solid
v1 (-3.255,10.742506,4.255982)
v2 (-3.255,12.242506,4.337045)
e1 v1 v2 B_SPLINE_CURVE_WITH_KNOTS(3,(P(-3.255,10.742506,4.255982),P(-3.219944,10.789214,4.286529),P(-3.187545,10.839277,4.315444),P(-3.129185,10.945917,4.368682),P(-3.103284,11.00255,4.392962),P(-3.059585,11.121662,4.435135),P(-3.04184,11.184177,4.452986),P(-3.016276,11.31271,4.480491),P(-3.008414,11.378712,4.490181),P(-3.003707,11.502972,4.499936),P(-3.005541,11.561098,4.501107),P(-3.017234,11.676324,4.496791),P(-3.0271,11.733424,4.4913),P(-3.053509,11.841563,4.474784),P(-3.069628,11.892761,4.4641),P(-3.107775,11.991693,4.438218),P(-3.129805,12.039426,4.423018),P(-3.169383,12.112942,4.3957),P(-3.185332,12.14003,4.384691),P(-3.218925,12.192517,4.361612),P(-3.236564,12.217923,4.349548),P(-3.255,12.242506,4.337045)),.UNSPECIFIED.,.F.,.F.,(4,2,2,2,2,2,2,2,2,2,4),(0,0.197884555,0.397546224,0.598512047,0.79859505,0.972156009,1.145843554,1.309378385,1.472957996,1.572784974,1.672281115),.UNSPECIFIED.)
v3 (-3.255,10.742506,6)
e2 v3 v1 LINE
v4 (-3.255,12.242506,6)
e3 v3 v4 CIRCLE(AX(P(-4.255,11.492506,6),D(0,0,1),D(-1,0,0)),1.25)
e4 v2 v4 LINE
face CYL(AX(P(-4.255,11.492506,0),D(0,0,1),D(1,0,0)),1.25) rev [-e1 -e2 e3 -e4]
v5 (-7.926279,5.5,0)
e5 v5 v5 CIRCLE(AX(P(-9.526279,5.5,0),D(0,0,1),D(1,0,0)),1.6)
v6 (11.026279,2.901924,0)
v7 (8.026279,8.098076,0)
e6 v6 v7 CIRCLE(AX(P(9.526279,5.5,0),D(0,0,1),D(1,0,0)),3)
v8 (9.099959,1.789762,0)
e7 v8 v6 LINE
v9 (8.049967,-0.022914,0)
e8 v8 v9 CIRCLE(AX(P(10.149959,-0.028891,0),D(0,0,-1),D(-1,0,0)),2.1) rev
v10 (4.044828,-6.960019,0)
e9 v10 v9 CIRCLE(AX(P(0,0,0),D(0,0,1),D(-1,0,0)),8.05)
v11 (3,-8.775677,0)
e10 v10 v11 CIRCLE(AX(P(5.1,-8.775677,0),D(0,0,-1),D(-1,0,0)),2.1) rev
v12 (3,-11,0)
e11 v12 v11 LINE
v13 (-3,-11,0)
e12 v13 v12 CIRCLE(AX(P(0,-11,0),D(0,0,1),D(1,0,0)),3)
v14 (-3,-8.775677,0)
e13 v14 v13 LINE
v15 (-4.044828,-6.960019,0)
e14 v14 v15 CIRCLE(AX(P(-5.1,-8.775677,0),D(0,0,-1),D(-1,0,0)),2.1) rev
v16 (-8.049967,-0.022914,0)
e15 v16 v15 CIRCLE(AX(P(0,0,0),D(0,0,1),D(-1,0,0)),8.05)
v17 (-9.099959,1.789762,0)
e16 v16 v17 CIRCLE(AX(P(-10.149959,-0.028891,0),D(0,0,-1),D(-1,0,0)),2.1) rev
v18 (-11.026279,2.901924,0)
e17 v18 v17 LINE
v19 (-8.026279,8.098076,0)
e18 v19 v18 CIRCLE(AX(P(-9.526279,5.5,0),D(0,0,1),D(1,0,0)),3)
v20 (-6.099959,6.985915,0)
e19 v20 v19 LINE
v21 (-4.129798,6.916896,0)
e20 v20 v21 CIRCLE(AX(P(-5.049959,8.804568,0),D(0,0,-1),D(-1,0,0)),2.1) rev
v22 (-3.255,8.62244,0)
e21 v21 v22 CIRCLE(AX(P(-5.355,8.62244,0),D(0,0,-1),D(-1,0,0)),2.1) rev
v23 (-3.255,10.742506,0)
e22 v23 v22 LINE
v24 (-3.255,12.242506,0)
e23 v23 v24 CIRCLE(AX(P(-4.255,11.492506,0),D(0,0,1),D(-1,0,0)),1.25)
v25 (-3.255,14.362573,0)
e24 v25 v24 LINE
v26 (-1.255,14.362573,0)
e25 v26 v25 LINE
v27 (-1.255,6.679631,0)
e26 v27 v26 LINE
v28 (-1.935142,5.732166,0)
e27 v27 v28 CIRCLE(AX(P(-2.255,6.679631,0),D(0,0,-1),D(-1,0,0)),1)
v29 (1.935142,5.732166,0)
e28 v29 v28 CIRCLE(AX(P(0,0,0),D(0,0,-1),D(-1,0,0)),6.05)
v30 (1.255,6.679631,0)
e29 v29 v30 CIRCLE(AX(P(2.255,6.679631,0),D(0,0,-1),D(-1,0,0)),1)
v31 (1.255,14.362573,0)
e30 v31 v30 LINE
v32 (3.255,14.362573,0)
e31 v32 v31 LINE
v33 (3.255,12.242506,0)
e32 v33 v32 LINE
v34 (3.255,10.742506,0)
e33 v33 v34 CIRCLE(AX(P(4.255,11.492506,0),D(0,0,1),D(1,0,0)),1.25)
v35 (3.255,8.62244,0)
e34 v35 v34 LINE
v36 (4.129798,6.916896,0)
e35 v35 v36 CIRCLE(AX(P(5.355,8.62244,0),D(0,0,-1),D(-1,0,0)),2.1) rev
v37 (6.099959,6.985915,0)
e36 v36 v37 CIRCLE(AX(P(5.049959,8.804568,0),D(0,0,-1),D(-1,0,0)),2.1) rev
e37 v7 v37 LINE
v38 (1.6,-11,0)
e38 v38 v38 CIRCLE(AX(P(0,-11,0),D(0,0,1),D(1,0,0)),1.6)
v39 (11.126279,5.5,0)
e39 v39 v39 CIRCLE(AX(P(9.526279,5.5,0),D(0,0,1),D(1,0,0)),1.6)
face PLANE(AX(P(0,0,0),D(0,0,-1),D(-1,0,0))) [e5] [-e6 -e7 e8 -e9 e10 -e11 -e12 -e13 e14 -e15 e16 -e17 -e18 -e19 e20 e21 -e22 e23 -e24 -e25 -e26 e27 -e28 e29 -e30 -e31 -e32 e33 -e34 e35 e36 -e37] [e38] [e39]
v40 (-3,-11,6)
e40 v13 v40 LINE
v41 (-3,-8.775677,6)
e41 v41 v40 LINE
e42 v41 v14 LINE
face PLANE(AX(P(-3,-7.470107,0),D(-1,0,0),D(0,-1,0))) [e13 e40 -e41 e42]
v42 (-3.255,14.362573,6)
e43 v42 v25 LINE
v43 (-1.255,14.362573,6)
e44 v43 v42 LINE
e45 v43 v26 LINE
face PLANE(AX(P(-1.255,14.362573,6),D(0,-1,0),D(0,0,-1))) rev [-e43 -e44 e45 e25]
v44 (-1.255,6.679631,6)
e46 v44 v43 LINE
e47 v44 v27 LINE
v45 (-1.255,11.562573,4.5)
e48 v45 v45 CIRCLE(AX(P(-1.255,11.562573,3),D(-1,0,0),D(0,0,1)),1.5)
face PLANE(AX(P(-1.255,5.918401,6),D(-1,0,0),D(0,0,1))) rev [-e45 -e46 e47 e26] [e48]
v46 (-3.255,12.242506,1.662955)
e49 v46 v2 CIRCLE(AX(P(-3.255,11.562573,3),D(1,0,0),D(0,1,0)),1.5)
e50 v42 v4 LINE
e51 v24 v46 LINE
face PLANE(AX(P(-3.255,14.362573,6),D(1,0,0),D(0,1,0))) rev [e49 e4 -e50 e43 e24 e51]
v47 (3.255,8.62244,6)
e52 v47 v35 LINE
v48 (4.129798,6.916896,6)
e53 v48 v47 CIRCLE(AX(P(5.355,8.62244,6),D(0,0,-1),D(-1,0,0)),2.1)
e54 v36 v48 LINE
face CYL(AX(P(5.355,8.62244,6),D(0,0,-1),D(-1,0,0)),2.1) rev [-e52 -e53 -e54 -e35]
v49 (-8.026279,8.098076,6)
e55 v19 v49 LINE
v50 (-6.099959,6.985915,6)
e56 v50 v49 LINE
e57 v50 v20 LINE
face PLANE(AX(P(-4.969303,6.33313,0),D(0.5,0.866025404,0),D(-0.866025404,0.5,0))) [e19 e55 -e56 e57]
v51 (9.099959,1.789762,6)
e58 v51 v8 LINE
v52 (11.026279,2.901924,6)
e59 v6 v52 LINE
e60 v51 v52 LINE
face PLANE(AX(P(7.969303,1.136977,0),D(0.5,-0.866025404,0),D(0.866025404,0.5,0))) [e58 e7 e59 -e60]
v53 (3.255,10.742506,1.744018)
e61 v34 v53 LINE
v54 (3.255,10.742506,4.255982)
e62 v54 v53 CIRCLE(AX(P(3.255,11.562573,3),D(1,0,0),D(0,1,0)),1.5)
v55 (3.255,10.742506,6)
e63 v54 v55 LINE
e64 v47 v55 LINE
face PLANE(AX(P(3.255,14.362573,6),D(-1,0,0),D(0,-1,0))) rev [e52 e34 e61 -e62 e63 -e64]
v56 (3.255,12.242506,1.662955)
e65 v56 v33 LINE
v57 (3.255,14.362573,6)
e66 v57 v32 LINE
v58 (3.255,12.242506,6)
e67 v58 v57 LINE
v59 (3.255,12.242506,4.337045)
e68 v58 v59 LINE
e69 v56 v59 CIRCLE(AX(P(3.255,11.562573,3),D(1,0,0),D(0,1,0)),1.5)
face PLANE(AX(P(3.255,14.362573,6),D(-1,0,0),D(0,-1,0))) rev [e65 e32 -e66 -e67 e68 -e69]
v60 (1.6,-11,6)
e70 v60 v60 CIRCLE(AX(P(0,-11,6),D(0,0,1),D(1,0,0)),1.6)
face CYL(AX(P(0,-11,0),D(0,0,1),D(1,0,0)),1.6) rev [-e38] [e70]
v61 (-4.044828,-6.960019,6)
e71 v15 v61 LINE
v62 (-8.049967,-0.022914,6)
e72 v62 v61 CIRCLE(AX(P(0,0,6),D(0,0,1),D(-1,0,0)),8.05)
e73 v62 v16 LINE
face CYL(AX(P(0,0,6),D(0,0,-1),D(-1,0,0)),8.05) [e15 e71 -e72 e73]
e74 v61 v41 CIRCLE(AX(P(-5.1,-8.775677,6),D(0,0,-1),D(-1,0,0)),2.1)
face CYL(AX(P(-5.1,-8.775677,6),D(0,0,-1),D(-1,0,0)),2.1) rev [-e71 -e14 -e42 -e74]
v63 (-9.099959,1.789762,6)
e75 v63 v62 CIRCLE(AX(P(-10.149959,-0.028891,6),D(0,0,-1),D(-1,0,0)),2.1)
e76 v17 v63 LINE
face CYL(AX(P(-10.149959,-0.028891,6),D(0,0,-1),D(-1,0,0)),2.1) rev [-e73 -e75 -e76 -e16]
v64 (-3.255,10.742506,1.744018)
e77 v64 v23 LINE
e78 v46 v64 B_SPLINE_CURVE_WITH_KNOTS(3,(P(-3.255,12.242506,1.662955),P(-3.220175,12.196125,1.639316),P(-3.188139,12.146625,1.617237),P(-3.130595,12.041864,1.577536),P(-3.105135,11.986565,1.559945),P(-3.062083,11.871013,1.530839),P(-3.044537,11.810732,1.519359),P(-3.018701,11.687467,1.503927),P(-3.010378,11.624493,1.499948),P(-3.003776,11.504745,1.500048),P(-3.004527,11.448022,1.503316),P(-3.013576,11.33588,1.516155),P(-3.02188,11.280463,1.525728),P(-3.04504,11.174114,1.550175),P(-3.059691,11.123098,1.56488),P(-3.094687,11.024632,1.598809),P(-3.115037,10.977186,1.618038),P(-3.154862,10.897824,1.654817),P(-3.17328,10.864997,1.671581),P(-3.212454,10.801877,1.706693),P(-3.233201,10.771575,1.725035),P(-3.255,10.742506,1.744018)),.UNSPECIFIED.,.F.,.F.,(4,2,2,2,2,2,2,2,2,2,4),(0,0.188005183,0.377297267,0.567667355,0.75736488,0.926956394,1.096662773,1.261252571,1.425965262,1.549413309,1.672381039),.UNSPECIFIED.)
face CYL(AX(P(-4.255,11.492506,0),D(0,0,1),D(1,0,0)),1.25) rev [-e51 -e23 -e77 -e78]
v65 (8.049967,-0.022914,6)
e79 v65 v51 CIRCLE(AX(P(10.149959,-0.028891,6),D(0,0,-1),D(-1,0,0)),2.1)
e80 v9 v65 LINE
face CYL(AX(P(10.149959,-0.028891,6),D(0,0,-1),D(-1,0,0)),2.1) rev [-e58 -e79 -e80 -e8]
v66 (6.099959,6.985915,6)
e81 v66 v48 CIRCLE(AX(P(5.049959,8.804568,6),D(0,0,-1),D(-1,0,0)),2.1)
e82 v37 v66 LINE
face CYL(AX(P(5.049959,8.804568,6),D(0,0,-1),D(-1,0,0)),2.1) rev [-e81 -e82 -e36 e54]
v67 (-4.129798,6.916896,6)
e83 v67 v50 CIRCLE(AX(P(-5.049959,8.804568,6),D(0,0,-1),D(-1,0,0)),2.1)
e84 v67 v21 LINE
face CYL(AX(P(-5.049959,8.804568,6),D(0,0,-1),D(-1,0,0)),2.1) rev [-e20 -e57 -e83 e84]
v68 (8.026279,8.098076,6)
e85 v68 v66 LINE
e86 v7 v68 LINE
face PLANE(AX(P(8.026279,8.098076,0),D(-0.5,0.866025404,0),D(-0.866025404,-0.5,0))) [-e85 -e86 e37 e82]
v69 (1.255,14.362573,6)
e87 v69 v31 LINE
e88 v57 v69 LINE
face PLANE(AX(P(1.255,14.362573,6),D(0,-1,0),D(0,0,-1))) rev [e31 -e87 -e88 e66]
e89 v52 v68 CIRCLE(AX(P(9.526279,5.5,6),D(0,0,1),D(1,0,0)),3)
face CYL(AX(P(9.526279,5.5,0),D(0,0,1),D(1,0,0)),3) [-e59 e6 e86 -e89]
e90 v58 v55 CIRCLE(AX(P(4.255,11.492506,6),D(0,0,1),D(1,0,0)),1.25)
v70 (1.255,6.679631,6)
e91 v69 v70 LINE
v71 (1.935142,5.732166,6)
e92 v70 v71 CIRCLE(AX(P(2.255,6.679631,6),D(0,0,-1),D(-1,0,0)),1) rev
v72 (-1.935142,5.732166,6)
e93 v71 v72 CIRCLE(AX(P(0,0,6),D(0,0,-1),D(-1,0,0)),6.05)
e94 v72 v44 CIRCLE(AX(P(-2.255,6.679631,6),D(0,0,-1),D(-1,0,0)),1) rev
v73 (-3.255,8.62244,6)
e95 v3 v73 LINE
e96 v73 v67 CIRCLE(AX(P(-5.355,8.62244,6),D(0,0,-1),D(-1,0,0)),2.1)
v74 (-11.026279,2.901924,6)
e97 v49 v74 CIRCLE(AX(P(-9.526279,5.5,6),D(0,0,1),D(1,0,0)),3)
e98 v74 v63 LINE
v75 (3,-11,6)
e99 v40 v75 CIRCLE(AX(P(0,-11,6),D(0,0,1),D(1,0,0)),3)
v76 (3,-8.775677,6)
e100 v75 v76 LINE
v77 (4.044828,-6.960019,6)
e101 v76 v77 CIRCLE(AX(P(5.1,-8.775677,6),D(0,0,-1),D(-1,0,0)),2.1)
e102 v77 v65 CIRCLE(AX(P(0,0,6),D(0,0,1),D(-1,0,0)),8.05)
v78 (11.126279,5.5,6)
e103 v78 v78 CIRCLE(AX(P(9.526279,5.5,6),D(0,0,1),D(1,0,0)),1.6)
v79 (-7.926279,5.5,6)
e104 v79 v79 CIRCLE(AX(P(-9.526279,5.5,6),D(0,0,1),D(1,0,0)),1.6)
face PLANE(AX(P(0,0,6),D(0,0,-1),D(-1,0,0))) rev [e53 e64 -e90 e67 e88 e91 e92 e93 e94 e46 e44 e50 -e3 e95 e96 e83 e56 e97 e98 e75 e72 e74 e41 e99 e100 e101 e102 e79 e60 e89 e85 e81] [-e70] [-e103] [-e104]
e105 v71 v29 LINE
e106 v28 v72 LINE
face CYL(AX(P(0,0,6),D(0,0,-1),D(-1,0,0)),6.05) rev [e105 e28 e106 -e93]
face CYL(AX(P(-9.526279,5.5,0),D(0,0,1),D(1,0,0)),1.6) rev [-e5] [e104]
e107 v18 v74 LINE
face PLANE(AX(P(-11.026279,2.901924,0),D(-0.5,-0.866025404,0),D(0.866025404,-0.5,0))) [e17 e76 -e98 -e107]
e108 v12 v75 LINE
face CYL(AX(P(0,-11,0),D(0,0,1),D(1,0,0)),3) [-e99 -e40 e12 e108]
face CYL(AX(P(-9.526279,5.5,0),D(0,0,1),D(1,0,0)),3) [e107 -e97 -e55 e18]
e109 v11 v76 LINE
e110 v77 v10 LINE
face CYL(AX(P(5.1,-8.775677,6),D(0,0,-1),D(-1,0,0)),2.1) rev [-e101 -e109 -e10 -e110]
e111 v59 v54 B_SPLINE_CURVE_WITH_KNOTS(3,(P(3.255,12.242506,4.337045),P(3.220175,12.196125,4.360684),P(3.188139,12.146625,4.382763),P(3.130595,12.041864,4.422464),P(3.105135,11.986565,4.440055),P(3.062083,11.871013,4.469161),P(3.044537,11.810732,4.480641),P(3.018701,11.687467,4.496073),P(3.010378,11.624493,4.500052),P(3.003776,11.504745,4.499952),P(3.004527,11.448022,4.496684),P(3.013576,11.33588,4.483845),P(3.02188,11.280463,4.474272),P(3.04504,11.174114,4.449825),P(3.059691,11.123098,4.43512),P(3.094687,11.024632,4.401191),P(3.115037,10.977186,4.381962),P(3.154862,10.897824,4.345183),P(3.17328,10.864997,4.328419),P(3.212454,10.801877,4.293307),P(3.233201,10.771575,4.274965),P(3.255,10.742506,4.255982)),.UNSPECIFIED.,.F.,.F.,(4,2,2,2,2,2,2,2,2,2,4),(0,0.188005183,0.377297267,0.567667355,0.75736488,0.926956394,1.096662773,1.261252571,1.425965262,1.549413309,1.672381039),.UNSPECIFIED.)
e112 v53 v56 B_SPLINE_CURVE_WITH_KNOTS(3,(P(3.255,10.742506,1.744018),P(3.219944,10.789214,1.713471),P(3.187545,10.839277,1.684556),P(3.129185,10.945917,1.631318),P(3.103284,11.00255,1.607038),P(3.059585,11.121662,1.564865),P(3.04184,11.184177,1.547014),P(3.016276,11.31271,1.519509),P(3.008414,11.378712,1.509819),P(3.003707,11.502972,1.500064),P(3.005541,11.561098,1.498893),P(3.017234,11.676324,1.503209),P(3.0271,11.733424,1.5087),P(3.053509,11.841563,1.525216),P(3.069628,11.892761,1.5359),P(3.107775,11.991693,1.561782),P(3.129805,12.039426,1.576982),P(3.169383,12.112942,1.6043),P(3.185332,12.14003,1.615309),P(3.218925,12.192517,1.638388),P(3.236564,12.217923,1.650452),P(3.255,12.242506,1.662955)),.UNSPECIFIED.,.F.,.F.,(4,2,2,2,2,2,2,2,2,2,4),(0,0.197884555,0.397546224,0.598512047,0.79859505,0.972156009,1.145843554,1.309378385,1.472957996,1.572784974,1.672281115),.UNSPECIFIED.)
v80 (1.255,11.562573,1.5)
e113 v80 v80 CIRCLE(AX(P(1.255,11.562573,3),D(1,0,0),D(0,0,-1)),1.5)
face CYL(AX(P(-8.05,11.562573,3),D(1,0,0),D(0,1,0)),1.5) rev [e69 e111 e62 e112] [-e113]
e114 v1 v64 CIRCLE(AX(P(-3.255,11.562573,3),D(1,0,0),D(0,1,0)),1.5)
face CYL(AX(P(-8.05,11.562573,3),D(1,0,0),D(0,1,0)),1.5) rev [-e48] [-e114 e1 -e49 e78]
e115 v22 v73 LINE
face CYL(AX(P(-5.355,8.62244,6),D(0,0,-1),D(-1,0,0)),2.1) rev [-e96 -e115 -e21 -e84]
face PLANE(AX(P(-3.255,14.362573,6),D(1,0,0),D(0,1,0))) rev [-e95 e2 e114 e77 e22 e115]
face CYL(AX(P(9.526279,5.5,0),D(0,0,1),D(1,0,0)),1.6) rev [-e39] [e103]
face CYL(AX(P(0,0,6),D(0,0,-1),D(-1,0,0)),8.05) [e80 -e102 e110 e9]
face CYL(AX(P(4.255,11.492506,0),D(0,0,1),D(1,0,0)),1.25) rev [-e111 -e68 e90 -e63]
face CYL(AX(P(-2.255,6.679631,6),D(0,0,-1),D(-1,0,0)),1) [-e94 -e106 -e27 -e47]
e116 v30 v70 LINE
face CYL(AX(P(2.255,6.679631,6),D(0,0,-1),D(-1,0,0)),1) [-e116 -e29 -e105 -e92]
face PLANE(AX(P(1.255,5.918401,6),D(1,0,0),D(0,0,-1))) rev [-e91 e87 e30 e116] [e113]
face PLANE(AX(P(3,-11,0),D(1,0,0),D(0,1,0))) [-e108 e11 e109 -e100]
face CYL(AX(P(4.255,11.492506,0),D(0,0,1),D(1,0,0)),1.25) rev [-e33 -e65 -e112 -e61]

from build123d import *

# Parameters (mm, degrees)
EXTRUDE_1_DEPTH     = 6
SKETCH_2_R          = 1.5
CUT_EXTRUDE_1_DEPTH = 20.23763281
SKETCH_3_R          = 1.6
EXTRUDE_2_DEPTH     = 6
FILLET_1_R          = 2.1
FILLET_2_R          = 1
SKETCH_4_R          = 1.25
CUT_EXTRUDE_2_DEPTH = 20.979768962


with BuildPart() as part:
    # ｽｹｯﾁ1 → ﾎﾞｽ - 押し出し1 (new body)
    with BuildSketch(Plane.XY):
        with BuildLine():
            Line((-1.255, 5.918401389), (-1.255, 14.36257258))
            Line((-1.255, 14.36257258), (-3.255, 14.36257258))
            Line((-3.255, 14.36257258), (-3.255, 7.36257258))
            ThreePointArc((-3.255, 7.36257258), (0, -8.05), (3.255, 7.36257258))
            Line((3.255, 7.36257258), (3.255, 14.36257258))
            Line((3.255, 14.36257258), (1.255, 14.36257258))
            Line((1.255, 14.36257258), (1.255, 5.918401389))
            ThreePointArc((1.255, 5.918401389), (0, -6.05), (-1.255, 5.918401389))
        make_face()
    extrude(amount=EXTRUDE_1_DEPTH)

    # ｽｹｯﾁ2 → ｶｯﾄ - 押し出し1 (cut, through all)
    with BuildSketch(Plane(origin=(3.255, 0, 0), x_dir=(0, 0, -1), z_dir=(1, 0, 0))):
        with Locations(Location((-3, 11.56257258, 0), (0, 0, 90))):
            Circle(SKETCH_2_R)
    extrude(amount=-CUT_EXTRUDE_1_DEPTH, mode=Mode.SUBTRACT)

    # ｽｹｯﾁ3 → ﾎﾞｽ - 押し出し2 (add, through all)
    # profile 1 of 3: a face of its own
    with BuildSketch(Plane.XY.offset(6)):
        with BuildLine():
            Line((-4.969302513, 6.333129758), (-8.026279442, 8.098076211))
            ThreePointArc((-8.026279442, 8.098076211), (-12.124355653, 7), (-11.026279442, 2.901923789))
            Line((-11.026279442, 2.901923789), (-7.969302513, 1.136977336))
            ThreePointArc((-7.969302513, 1.136977336), (-6.9715045, 4.025), (-4.969302513, 6.333129758))
        make_face()
        with Locations((-9.526279442, 5.5)):
            Circle(SKETCH_3_R, mode=Mode.SUBTRACT)
    # profile 2 of 3: a face of its own
    with BuildSketch(Plane.XY.offset(6)):
        with BuildLine():
            Line((8.026279442, 8.098076211), (4.969302513, 6.333129758))
            ThreePointArc((4.969302513, 6.333129758), (6.9715045, 4.025), (7.969302513, 1.136977336))
            Line((7.969302513, 1.136977336), (11.026279442, 2.901923789))
            ThreePointArc((11.026279442, 2.901923789), (12.124355653, 7), (8.026279442, 8.098076211))
        make_face()
        with Locations((9.526279442, 5.5)):
            Circle(SKETCH_3_R, mode=Mode.SUBTRACT)
    # profile 3 of 3: a face of its own
    with BuildSketch(Plane.XY.offset(6)):
        with BuildLine():
            Line((3, -11), (3, -7.470107094))
            ThreePointArc((3, -7.470107094), (0, -8.05), (-3, -7.470107094))
            Line((-3, -7.470107094), (-3, -11))
            ThreePointArc((-3, -11), (0, -14), (3, -11))
        make_face()
        with Locations((0, -11)):
            Circle(SKETCH_3_R, mode=Mode.SUBTRACT)
    extrude(amount=-EXTRUDE_2_DEPTH)

    # ﾌｨﾚｯﾄ1
    # the kernel refuses this fillet: 2.1 mm, written as the material it adds along each edge
    with BuildSketch(Plane(origin=(3.255, 7.36257258, 0), x_dir=(0.8842030952275957, -0.46710265080594376, 0), z_dir=(0, 0, 1))) as fillet_1_piece_1:
        with BuildLine():
            CenterArc((1.268338995, 2.094894415), FILLET_1_R, 207.846387093, 58.157490839)
            Line((-0.588487505, 1.113978849), (0, 0))
            ThreePointArc((0, 0), (0.560996094, 0.019571407), (1.121992188, 0))
        make_face()
    extrude(amount=6)
    with BuildSketch(Plane(origin=(-3.255, 7.36257258, 0), x_dir=(0, 1, 0), z_dir=(0, 0, 1))) as fillet_1_piece_2:
        with BuildLine():
            CenterArc((1.25986762, 2.1), FILLET_1_R, 211.842509161, 58.157490839)
            ThreePointArc((-0.524085525, 0.992068966), (-0.244737664, 0.505176339), (0, 0))
            Line((0, 0), (1.25986762, 0))
        make_face()
    extrude(amount=6)
    with BuildSketch(Plane(origin=(-4.969302513, 6.333129758, 6), x_dir=(0.8292498658950391, 0.5588780367066322, 0), z_dir=(0, 0, -1)), Plane(origin=(7.969302513, 1.136977336, 6), x_dir=(0.06937764445759169, -0.9975904683032591, 0), z_dir=(0, 0, -1)), Plane(origin=(-3, -7.470107094, 6), x_dir=(-0.8986275103526323, 0.4387124315966321, 0), z_dir=(0, 0, -1))) as fillet_1_piece_3:
        with BuildLine():
            CenterArc((1.314348194, -2.094516792), FILLET_1_R, 94.141330549, 59.836911418)
            Line((-0.572769578, -1.173220685), (0, 0))
            ThreePointArc((0, 0), (0.581346317, -0.021018965), (1.162692633, 0))
        make_face()
    extrude(amount=6)
    with BuildSketch(Plane(origin=(-7.969302513, 1.136977336, 6), x_dir=(-0.06937764445760207, -0.9975904683032585, 0), z_dir=(0, 0, -1)), Plane(origin=(4.969302513, 6.333129758, 6), x_dir=(-0.8292498658950355, 0.5588780367066375, 0), z_dir=(0, 0, -1)), Plane(origin=(3, -7.470107094, 6), x_dir=(0.8986275103526384, 0.43871243159661977, 0), z_dir=(0, 0, -1))) as fillet_1_piece_4:
        with BuildLine():
            CenterArc((1.314348194, 2.094516792), FILLET_1_R, 206.021758033, 59.836911418)
            Line((-0.572769578, 1.173220685), (0, 0))
            ThreePointArc((0, 0), (0.581346317, 0.021018965), (1.162692633, 0))
        make_face()
    extrude(amount=6)

    # ﾌｨﾚｯﾄ2
    fillet_2_edges = [part.edges().sort_by_distance(p)[0] for p in [
        (1.255, 5.918401389, 3),
        (-1.255, 5.918401389, 3),
    ]]
    fillet(fillet_2_edges, radius=FILLET_2_R)

    # ｽｹｯﾁ4 → ｶｯﾄ - 押し出し2 (cut, through all)
    with BuildSketch(Plane.XY.offset(6)):
        with Locations((4.255, 11.49250639)):
            Circle(SKETCH_4_R)
        with Locations((-4.255, 11.49250639)):
            Circle(SKETCH_4_R)
    extrude(amount=-CUT_EXTRUDE_2_DEPTH, mode=Mode.SUBTRACT)


solid = part.part
